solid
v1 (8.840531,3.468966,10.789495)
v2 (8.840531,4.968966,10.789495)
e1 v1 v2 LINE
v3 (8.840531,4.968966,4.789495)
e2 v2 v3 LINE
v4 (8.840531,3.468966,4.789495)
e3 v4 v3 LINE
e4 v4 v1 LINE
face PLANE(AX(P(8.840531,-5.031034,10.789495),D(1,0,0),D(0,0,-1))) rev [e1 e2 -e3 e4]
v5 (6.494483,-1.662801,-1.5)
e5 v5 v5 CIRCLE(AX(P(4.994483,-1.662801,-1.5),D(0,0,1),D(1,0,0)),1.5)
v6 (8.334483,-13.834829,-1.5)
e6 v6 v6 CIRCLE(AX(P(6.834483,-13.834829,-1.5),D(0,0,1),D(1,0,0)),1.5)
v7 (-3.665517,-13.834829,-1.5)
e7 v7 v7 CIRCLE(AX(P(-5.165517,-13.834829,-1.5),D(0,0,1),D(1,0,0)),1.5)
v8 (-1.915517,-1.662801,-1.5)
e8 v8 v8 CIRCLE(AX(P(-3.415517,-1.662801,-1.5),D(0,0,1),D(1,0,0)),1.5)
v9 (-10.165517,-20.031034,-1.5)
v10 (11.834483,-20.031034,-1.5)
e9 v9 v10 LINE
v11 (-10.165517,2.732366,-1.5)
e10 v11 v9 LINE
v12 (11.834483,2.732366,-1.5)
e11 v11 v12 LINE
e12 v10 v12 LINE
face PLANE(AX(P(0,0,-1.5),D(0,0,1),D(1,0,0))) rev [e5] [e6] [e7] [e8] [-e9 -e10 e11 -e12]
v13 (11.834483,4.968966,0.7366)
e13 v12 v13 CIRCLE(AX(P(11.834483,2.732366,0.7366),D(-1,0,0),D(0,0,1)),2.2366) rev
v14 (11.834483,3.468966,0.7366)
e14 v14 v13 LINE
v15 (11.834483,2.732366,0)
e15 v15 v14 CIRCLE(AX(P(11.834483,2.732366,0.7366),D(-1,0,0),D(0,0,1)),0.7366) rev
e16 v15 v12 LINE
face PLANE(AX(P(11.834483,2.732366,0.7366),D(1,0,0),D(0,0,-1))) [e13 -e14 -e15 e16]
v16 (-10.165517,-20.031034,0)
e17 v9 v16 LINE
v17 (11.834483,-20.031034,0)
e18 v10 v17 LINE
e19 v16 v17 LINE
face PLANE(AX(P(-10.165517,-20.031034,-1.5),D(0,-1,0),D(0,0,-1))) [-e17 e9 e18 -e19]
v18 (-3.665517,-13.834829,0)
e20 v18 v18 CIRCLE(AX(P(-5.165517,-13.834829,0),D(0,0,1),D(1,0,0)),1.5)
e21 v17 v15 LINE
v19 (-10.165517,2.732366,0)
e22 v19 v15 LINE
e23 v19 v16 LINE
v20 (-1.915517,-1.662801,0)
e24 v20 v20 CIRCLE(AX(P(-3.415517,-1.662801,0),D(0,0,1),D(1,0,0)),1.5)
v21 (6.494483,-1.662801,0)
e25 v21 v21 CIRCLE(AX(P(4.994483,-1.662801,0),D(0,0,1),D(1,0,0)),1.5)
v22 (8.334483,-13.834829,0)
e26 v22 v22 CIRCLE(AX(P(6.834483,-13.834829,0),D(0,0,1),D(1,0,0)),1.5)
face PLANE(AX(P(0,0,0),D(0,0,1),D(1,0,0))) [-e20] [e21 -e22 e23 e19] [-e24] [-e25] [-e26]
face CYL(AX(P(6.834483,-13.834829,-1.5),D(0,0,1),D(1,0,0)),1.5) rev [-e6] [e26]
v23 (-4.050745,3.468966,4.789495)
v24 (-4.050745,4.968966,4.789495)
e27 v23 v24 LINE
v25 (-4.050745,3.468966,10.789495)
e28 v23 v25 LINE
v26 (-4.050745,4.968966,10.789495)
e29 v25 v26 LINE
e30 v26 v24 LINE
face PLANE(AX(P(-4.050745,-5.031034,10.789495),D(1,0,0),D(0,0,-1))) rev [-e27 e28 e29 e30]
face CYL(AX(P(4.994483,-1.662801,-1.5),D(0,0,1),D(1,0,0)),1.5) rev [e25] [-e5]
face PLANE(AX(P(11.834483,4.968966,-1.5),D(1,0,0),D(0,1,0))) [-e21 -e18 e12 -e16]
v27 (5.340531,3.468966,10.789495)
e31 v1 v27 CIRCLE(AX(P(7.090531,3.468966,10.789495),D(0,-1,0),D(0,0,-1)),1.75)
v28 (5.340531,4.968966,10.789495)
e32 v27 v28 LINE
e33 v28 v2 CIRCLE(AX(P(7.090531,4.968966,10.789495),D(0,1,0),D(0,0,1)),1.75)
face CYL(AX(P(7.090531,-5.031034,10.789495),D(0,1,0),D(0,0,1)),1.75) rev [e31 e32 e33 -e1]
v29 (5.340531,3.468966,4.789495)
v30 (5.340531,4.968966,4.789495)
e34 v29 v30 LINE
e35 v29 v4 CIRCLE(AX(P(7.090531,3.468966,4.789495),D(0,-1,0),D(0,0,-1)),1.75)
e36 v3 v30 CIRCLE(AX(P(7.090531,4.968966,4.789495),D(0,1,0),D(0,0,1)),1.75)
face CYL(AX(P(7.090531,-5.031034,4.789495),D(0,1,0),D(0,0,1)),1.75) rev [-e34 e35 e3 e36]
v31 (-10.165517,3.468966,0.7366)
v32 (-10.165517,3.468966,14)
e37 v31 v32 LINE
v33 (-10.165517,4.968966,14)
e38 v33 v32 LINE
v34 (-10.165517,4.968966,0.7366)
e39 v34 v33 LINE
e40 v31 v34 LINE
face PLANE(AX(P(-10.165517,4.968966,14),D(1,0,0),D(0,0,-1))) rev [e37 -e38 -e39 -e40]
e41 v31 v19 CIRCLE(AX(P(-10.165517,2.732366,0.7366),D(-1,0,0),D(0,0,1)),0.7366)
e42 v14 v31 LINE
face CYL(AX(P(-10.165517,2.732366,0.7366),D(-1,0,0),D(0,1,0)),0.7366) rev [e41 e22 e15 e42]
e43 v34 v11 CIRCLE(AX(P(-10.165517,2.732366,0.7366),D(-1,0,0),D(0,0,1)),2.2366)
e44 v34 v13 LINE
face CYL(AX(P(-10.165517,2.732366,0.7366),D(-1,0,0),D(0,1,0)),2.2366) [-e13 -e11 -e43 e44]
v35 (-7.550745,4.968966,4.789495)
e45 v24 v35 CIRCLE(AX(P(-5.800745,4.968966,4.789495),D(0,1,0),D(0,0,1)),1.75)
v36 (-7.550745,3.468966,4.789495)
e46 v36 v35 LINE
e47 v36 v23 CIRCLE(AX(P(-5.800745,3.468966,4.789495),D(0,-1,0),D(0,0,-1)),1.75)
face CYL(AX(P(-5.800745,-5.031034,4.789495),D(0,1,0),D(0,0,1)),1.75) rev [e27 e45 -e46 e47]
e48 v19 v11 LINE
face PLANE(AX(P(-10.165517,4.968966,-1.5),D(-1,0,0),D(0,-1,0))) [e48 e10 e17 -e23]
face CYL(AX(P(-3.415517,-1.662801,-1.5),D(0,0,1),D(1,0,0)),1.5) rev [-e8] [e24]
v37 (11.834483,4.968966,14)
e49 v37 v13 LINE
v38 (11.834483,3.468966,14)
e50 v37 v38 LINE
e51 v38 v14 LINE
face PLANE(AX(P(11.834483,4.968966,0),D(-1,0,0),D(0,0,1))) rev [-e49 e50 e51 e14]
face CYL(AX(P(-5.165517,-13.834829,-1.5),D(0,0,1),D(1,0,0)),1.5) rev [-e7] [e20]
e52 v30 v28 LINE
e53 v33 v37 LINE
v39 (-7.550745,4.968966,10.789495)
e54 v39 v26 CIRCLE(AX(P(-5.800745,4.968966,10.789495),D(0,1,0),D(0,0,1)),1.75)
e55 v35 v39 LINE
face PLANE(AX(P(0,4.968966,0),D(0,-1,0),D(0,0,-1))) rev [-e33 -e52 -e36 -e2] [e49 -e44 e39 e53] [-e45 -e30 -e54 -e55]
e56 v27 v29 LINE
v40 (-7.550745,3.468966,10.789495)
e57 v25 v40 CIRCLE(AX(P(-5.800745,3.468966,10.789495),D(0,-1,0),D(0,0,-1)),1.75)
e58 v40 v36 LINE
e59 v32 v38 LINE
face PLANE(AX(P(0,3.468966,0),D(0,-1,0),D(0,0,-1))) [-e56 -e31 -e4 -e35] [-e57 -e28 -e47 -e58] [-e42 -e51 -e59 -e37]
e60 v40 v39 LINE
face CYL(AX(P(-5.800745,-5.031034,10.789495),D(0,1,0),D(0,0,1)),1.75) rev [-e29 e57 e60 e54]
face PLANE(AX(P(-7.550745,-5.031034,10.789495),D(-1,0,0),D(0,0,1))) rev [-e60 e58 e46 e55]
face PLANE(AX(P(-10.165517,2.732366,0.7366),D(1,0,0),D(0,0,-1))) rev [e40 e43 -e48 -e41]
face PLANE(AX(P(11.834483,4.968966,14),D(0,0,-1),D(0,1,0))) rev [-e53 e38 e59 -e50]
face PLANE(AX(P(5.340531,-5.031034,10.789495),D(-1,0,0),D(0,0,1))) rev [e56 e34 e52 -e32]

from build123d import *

# Parameters (mm, degrees)
SKETCH1_W                    = 22
SKETCH1_H                    = 25
SKETCH1_R                    = 1.5
BASE_FLANGE1_DEPTH           = 1.5
EDGE_FLANGE1_STRIP_W         = 7.4732
EDGE_FLANGE1_STRIP_H         = 1.5
EDGE_FLANGE1_STRIP_CUT_DEPTH = 22
EDGE_FLANGE1_DEPTH           = 22
CUT_EXTRUDE1_DEPTH           = 10


# Sheet-metal steps are written as plain solids
with BuildPart() as part:
    # Sketch1 → Base-Flange1 (new body)
    with BuildSketch(Plane.XY):
        with Locations((0.834482759, -7.531034483)):
            Rectangle(SKETCH1_W, SKETCH1_H)
        with Locations((6.834482759, -13.834829283)):
            Circle(SKETCH1_R, mode=Mode.SUBTRACT)
        with Locations((-5.165517241, -13.834829283)):
            Circle(SKETCH1_R, mode=Mode.SUBTRACT)
        with Locations((-3.415517241, -1.662801421)):
            Circle(SKETCH1_R, mode=Mode.SUBTRACT)
        with Locations((4.994482759, -1.662801421)):
            Circle(SKETCH1_R, mode=Mode.SUBTRACT)
    extrude(amount=-BASE_FLANGE1_DEPTH)

    # Edge-Flange1 strip (across the edge) → Edge-Flange1 strip cut (cut)
    with BuildSketch(Plane(origin=(11.834482759, 4.968965517, 0), x_dir=(0, -1, 0), z_dir=(-1, 0, 0))):
        with Locations((-1.5, -0.75)):
            Rectangle(EDGE_FLANGE1_STRIP_W, EDGE_FLANGE1_STRIP_H)
    extrude(amount=EDGE_FLANGE1_STRIP_CUT_DEPTH, mode=Mode.SUBTRACT)

    # Edge-Flange1 section (across the edge) → Edge-Flange1 (add)
    with BuildSketch(Plane(origin=(11.834482759, 4.968965517, 0), x_dir=(0, -1, 0), z_dir=(-1, 0, 0))):
        with BuildLine():
            Line((0, 0.7366), (0, 14))
            Line((0, 14), (1.5, 14))
            Line((1.5, 14), (1.5, 0.7366))
            ThreePointArc((1.5, 0.7366), (1.715745145, 0.215745145), (2.2366, 0))
            Line((2.2366, 0), (2.2366, -1.5))
            ThreePointArc((2.2366, -1.5), (0.655084973, -0.844915027), (0, 0.7366))
        make_face()
    extrude(amount=EDGE_FLANGE1_DEPTH)

    # Sketch11 → Cut-Extrude1 (cut)
    with BuildSketch(Plane(origin=(0, 4.968965517, 0), x_dir=(1, 0, 0), z_dir=(0, 1, 0))):
        with BuildLine():
            Line((-4.050745128, -10.789495208), (-4.050745128, -4.789495208))
            ThreePointArc((-4.050745128, -4.789495208), (-5.800745128, -3.039495208), (-7.550745128, -4.789495208))
            Line((-7.550745128, -4.789495208), (-7.550745128, -10.789495208))
            ThreePointArc((-7.550745128, -10.789495208), (-5.800745128, -12.539495208), (-4.050745128, -10.789495208))
        make_face()
        with BuildLine():
            Line((8.840531004, -10.789495208), (8.840531004, -4.789495208))
            ThreePointArc((8.840531004, -4.789495208), (7.090531004, -3.039495208), (5.340531004, -4.789495208))
            Line((5.340531004, -4.789495208), (5.340531004, -10.789495208))
            ThreePointArc((5.340531004, -10.789495208), (7.090531004, -12.539495208), (8.840531004, -10.789495208))
        make_face()
    extrude(amount=-CUT_EXTRUDE1_DEPTH, mode=Mode.SUBTRACT)


solid = part.part
